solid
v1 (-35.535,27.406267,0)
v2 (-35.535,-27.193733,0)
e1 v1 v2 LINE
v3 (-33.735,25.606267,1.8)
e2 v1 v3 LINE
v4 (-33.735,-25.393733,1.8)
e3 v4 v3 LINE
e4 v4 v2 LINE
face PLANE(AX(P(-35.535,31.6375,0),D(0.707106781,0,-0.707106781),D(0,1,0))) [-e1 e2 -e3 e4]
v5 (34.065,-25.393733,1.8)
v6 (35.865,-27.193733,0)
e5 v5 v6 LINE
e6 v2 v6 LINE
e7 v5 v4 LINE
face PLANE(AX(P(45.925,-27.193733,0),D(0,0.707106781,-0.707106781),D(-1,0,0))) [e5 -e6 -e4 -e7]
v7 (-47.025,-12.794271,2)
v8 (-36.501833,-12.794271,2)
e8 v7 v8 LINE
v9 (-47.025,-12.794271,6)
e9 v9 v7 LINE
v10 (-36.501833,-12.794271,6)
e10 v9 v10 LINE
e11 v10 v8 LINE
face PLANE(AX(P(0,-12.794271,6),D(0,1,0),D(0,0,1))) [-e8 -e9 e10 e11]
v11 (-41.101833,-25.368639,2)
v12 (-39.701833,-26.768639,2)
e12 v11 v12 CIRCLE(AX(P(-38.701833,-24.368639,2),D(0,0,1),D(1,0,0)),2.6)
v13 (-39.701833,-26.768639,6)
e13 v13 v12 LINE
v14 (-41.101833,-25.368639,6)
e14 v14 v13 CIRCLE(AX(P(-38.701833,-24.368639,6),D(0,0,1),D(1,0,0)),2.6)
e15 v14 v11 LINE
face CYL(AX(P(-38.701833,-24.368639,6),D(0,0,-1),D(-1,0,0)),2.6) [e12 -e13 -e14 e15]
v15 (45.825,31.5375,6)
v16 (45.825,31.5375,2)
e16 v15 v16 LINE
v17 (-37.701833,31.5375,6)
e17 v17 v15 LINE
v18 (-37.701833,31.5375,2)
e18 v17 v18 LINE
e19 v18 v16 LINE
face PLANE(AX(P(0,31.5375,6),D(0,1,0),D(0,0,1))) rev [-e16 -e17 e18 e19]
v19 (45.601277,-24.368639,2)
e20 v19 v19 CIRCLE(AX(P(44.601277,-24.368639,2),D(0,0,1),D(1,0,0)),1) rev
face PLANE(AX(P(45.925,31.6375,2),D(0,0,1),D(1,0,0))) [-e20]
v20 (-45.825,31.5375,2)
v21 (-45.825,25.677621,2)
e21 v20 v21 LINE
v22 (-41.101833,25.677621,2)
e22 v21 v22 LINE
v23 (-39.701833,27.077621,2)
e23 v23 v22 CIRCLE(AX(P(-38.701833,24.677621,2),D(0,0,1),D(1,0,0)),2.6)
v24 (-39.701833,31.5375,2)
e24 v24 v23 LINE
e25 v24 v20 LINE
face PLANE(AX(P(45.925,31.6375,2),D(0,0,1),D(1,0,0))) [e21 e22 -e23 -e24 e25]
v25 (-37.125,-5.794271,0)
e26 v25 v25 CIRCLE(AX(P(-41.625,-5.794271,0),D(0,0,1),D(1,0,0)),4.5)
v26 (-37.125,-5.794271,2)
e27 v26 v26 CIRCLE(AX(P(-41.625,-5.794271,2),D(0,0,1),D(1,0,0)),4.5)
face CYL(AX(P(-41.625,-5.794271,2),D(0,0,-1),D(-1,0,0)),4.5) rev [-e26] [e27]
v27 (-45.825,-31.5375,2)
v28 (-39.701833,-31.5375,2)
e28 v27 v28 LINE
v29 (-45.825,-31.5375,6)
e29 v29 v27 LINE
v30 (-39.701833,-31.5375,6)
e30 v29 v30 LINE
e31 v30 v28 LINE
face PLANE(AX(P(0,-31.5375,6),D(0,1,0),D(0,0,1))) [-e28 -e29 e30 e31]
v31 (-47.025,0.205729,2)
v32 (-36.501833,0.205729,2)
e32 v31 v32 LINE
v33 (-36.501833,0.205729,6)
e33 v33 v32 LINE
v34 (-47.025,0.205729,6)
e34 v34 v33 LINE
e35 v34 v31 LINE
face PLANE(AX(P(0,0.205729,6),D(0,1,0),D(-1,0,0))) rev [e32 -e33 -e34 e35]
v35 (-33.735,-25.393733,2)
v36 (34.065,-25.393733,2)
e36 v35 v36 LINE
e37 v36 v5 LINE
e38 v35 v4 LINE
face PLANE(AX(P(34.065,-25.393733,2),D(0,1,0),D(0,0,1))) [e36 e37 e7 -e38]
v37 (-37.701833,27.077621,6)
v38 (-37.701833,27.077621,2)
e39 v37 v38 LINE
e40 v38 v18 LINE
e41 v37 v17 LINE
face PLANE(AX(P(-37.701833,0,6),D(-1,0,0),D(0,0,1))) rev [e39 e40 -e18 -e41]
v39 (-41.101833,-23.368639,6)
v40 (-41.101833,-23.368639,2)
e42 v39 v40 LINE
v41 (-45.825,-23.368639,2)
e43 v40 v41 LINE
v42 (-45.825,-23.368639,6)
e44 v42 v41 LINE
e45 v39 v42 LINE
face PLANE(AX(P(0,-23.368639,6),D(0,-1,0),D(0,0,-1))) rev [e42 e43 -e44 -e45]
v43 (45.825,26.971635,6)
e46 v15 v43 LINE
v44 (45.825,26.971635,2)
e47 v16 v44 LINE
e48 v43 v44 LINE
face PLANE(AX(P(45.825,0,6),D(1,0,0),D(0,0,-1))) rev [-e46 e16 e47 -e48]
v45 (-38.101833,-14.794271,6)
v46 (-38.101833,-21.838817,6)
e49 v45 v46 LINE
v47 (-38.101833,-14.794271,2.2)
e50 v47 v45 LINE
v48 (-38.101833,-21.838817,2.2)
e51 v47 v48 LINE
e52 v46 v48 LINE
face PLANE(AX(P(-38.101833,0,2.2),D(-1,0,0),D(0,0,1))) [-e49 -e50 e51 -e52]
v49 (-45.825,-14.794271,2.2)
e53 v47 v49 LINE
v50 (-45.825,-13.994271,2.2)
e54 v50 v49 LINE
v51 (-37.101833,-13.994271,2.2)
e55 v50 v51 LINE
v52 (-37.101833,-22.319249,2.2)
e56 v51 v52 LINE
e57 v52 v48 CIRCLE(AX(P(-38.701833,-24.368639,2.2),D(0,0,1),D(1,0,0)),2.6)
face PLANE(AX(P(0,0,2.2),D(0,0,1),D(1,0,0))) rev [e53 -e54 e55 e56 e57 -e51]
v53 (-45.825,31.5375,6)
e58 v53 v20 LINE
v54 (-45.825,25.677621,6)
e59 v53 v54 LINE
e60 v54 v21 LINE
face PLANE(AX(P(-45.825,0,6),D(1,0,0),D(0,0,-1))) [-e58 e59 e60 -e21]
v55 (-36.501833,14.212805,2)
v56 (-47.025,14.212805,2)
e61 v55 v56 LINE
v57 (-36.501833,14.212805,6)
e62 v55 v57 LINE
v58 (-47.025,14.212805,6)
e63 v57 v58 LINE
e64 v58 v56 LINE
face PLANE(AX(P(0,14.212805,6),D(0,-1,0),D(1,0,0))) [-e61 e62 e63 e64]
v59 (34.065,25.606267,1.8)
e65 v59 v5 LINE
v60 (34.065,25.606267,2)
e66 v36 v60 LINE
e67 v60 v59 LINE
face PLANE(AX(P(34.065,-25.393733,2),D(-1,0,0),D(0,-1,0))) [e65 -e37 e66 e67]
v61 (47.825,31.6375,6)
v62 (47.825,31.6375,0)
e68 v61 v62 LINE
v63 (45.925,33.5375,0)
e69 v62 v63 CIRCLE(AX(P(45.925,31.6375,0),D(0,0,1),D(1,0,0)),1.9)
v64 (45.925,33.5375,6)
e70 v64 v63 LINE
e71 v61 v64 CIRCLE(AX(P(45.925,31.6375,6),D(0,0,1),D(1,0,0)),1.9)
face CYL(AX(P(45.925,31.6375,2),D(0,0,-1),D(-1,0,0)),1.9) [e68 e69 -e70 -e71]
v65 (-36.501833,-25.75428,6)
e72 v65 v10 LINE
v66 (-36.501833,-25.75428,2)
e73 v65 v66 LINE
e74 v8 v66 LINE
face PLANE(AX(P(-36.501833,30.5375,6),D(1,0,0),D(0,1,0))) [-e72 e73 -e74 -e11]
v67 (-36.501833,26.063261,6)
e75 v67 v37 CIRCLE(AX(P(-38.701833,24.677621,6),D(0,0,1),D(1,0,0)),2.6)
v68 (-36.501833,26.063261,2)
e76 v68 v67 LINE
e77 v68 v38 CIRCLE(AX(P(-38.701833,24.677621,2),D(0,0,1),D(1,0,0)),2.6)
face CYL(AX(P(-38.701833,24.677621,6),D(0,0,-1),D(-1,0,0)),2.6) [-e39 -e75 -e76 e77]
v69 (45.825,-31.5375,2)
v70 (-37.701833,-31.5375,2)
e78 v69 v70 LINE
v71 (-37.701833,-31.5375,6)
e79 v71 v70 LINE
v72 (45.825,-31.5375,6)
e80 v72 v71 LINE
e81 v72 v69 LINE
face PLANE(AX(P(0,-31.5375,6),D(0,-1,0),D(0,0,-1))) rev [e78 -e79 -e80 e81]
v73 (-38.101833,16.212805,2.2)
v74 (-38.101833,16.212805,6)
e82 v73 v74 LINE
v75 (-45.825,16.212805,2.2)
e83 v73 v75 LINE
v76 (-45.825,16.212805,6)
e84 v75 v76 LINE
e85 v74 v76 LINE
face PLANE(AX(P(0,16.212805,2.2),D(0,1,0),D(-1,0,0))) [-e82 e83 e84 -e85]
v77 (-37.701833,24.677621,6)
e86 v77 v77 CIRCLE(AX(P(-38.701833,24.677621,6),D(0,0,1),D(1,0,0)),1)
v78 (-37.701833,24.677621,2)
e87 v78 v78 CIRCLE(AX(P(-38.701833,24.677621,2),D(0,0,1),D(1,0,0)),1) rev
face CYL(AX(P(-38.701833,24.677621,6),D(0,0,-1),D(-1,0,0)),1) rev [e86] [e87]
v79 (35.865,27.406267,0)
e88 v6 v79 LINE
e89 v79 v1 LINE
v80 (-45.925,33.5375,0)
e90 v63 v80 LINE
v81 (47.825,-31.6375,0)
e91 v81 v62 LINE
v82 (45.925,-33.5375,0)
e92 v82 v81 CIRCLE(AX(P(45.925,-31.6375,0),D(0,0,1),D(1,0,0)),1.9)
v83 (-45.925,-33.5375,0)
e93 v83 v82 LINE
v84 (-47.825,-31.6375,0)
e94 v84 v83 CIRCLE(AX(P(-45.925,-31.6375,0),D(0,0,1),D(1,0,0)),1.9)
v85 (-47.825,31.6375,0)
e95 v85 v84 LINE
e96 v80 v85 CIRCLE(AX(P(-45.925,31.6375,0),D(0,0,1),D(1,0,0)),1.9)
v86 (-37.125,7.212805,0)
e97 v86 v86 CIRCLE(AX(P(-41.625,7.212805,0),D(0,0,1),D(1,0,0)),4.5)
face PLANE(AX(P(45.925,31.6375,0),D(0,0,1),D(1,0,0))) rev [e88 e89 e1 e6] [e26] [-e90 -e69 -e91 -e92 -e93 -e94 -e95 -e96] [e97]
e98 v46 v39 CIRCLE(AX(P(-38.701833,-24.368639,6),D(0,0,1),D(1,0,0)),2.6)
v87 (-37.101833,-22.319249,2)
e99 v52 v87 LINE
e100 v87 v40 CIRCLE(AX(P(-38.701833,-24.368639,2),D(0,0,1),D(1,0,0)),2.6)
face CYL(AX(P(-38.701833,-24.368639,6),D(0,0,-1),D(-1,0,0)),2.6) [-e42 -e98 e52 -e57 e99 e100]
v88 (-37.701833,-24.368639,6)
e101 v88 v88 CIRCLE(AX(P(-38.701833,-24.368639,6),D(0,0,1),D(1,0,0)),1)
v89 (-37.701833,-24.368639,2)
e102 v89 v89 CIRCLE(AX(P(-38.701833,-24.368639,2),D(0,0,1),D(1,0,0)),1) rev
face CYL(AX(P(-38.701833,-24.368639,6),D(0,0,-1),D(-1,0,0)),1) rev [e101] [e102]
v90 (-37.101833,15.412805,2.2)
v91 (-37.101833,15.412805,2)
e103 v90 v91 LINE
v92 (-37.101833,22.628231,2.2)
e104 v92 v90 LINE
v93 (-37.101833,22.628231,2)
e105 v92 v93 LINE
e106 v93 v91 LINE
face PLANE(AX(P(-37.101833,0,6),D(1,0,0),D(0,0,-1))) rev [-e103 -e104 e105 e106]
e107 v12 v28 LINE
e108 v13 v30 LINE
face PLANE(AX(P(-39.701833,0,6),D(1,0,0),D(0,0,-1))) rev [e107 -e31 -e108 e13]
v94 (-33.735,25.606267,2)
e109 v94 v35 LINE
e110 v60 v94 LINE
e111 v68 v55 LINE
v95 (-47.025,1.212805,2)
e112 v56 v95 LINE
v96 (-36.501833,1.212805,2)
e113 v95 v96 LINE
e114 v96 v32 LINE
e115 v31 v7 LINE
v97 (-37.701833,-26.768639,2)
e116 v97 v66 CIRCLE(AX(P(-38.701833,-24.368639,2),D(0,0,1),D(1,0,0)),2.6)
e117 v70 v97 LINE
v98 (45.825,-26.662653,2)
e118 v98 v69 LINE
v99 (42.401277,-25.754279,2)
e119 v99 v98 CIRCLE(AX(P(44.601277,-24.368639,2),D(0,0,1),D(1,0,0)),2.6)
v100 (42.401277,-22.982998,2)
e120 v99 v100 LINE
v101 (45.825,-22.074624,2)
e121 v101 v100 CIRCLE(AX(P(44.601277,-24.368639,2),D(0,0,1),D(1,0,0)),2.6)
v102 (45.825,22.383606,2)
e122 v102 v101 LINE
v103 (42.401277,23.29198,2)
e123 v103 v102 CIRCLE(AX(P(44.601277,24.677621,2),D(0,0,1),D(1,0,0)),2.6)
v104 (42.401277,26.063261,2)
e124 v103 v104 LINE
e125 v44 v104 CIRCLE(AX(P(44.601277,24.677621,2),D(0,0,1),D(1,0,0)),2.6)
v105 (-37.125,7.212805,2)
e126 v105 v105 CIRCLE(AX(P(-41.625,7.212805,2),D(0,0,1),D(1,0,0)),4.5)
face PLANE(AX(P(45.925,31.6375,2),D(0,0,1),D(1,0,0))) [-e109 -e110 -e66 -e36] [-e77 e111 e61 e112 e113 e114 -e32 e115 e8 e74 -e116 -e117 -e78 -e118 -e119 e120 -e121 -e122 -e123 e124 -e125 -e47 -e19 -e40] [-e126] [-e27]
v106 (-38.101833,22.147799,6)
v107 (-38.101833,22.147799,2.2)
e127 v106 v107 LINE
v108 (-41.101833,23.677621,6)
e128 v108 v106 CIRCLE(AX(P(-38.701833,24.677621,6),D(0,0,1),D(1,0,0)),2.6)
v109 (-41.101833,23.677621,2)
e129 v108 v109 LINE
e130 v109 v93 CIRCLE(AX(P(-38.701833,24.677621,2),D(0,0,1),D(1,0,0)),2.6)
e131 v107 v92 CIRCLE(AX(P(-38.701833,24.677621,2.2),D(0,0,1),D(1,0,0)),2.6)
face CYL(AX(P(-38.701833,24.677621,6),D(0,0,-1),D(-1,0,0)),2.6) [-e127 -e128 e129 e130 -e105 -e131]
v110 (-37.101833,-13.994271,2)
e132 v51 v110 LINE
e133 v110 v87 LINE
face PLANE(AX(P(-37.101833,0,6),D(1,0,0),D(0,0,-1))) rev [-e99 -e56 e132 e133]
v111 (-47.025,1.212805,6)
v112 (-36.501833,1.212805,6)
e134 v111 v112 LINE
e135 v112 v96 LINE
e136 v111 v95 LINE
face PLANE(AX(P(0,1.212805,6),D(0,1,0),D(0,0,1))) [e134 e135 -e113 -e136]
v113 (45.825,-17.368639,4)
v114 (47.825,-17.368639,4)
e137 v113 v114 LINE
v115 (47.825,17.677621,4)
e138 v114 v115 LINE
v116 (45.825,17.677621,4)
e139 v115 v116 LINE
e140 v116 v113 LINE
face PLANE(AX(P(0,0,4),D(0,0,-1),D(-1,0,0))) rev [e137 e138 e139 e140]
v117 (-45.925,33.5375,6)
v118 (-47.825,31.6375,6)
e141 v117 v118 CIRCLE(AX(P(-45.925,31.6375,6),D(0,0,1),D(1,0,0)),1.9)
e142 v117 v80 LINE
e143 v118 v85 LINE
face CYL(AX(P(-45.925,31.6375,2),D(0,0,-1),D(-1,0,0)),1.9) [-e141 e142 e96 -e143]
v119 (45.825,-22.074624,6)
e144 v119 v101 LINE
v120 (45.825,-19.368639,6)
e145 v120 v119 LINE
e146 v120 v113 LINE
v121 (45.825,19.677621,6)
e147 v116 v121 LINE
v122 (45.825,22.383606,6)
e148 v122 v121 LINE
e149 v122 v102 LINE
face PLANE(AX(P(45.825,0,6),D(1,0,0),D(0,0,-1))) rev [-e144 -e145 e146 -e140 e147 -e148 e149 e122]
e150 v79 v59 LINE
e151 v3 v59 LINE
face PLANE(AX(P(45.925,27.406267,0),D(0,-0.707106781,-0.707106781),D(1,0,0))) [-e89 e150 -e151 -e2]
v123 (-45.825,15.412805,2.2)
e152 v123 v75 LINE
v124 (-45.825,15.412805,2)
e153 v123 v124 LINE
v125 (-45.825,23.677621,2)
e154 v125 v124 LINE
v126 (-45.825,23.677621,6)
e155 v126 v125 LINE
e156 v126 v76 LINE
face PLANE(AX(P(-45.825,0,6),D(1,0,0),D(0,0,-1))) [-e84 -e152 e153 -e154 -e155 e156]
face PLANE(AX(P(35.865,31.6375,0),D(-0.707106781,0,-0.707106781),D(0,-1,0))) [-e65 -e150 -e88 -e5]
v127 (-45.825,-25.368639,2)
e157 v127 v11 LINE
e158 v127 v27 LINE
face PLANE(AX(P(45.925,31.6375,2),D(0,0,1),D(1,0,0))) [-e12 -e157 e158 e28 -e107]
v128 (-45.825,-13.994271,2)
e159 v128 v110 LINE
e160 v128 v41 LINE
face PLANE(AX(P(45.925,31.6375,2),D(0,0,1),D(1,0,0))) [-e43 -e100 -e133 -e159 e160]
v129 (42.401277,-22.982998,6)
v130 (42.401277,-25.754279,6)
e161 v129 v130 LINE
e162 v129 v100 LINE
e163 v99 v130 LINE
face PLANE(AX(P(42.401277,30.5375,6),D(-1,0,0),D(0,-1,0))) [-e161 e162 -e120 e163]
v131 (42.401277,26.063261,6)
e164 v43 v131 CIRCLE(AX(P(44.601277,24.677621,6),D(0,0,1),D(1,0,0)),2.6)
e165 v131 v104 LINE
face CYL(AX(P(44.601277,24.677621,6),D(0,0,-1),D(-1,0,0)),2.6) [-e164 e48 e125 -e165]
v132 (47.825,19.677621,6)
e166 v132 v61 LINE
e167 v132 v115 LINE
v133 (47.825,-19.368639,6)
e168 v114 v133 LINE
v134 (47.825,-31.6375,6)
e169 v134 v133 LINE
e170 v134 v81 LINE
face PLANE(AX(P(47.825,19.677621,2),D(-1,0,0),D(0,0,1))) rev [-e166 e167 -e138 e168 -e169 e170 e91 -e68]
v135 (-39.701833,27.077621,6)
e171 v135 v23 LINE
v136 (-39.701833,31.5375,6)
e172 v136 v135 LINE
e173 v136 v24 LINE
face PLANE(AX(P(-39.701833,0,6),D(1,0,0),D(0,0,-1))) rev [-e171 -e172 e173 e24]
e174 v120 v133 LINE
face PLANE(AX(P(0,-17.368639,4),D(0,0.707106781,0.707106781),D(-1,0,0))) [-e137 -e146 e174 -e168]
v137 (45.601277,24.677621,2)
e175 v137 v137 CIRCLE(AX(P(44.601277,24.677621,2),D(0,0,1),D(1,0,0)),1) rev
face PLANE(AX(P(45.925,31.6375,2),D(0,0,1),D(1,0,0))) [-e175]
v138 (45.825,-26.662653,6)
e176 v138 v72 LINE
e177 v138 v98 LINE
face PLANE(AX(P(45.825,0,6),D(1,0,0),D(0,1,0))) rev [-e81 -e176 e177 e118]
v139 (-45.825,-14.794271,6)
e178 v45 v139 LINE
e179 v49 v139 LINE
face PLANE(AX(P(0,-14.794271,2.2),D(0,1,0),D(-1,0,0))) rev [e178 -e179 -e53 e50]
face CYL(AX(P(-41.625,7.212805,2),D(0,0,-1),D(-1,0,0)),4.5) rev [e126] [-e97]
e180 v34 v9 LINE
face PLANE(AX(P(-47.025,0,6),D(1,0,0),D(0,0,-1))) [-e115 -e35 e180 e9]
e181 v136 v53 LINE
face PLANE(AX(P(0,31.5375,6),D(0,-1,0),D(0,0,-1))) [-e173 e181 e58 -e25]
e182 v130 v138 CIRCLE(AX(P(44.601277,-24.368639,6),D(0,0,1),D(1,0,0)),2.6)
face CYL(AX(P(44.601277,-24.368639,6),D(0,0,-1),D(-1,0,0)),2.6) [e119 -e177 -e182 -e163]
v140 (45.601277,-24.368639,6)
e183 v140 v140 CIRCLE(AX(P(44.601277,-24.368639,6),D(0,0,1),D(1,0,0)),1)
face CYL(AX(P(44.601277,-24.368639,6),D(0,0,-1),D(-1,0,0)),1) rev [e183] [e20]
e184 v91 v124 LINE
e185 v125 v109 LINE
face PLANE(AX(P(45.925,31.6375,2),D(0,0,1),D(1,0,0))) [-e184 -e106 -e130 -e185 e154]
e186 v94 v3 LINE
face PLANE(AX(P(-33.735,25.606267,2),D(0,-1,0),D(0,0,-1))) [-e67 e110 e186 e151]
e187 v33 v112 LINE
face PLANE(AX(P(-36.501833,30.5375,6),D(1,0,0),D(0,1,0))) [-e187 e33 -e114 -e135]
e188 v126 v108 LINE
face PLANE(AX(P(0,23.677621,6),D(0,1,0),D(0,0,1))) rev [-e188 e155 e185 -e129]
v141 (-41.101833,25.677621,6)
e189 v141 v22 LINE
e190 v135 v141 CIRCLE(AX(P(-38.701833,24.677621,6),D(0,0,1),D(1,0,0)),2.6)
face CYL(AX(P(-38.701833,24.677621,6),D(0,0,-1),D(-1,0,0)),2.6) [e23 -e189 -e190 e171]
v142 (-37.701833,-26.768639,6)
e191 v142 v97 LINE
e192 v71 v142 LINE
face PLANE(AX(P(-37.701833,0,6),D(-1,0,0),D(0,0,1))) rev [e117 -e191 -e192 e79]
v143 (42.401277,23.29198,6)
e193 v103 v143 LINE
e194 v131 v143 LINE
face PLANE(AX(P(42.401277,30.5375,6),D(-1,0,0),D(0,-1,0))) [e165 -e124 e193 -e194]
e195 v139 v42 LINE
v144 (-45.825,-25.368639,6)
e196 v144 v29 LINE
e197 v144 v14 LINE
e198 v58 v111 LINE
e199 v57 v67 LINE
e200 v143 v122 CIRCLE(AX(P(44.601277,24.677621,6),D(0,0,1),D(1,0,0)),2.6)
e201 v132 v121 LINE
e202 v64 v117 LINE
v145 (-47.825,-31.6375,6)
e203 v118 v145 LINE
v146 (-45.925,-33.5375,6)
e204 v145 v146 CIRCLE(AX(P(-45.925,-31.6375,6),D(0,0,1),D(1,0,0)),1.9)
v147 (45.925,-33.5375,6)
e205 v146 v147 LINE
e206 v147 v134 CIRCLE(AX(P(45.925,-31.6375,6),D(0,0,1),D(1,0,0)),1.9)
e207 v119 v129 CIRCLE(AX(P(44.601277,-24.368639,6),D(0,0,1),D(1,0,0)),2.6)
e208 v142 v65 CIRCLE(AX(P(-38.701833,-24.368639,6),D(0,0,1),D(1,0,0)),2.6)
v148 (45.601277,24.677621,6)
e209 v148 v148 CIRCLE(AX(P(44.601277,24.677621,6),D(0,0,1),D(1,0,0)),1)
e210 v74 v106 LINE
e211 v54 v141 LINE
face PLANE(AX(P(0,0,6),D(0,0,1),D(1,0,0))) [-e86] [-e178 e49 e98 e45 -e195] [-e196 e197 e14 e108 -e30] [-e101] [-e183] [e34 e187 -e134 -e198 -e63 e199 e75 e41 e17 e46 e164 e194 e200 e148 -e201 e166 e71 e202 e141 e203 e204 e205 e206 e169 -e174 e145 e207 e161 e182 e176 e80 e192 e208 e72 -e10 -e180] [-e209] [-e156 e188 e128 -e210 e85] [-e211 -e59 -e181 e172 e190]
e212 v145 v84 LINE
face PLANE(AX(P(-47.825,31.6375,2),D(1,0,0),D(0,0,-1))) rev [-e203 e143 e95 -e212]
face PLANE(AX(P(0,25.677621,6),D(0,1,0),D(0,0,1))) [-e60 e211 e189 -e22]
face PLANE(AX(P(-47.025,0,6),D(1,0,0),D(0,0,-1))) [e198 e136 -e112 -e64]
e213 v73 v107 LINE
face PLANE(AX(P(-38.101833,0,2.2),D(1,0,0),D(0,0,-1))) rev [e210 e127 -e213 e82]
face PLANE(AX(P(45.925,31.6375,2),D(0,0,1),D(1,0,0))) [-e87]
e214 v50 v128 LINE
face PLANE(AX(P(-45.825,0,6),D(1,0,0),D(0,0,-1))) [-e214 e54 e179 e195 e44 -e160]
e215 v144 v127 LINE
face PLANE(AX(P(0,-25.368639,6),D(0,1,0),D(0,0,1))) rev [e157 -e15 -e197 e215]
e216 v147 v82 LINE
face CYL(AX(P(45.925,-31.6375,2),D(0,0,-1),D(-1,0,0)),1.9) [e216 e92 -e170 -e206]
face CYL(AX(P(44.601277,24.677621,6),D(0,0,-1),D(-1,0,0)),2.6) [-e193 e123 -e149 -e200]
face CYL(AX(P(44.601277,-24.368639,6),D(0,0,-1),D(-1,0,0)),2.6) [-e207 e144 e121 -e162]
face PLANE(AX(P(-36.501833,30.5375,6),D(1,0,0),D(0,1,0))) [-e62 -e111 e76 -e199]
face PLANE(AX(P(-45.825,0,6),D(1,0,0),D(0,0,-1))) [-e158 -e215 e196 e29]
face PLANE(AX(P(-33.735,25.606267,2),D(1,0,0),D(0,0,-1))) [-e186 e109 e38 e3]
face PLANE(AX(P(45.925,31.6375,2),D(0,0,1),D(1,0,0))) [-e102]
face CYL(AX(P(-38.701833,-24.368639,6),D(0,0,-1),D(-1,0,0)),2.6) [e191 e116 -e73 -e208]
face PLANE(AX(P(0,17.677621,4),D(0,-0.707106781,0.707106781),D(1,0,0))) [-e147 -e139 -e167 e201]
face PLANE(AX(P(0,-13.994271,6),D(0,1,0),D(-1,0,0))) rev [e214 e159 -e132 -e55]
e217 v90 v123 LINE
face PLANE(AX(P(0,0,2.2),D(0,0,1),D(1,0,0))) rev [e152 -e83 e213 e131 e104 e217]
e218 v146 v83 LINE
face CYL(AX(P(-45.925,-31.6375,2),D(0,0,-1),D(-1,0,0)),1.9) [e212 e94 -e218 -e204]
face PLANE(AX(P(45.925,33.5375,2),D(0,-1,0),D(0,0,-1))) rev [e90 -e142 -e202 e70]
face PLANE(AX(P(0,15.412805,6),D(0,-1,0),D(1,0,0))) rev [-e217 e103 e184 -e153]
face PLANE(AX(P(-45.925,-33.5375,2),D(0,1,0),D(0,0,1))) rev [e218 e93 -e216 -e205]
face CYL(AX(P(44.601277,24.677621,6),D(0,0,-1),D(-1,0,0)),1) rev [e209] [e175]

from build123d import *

# Parameters (mm, degrees)
SKETCH_2_R          = 4.5
SKETCH_2_W          = 67.8
SKETCH_2_H          = 51
EXTRUDE_1_DEPTH     = 2
SKETCH_3_R          = 1
EXTRUDE_2_DEPTH     = 4
SKETCH_4_W          = 7.723167142
SKETCH_4_H          = 2
SKETCH_4_W_2        = 2
SKETCH_4_H_2        = 9
SKETCH_4_H_3        = 10
EXTRUDE_3_DEPTH     = 3.8
CUT_EXTRUDE_1_DEPTH = 2
CHAMFER_2_SIZE      = 2
SKETCH_6_W          = 78.903110185
SKETCH_6_H          = 60.07500003
CUT_EXTRUDE_2_DEPTH = 4
CHAMFER_3_SIZE      = 1.8


with BuildPart() as part:
    # Эскиз2 → Бобышка-Вытянуть1 (new body)
    with BuildSketch(Plane.XY):
        with BuildLine():
            Line((-47.825, 31.6375), (-47.825, -31.6375))
            ThreePointArc((-47.825, -31.6375), (-47.268502884, -32.981002884), (-45.925, -33.5375))
            Line((-45.925, -33.5375), (45.925, -33.5375))
            ThreePointArc((45.925, -33.5375), (47.268502884, -32.981002884), (47.825, -31.6375))
            Line((47.825, -31.6375), (47.825, -19.36863872))
            Line((47.825, -19.36863872), (47.825, -17.36863872))
            Line((47.825, -17.36863872), (47.825, 17.677620675))
            Line((47.825, 17.677620675), (47.825, 19.677620675))
            Line((47.825, 19.677620675), (47.825, 31.6375))
            ThreePointArc((47.825, 31.6375), (47.268502884, 32.981002884), (45.925, 33.5375))
            Line((45.925, 33.5375), (-45.925, 33.5375))
            ThreePointArc((-45.925, 33.5375), (-47.268502884, 32.981002884), (-47.825, 31.6375))
        make_face()
        with Locations((-41.625, 7.212805211)):
            Circle(SKETCH_2_R, mode=Mode.SUBTRACT)
        with Locations((-41.625, -5.794271444)):
            Circle(SKETCH_2_R, mode=Mode.SUBTRACT)
        with Locations((0.165, 0.106266667)):
            Rectangle(SKETCH_2_W, SKETCH_2_H, mode=Mode.SUBTRACT)
    extrude(amount=EXTRUDE_1_DEPTH)

    # Эскиз3 → Бобышка-Вытянуть2 (add)
    with BuildSketch(Plane.XY.offset(2)):
        with BuildLine():
            ThreePointArc((47.825, 31.6375), (47.268502884, 32.981002884), (45.925, 33.5375))
            Line((45.925, 33.5375), (-45.925, 33.5375))
            ThreePointArc((-45.925, 33.5375), (-47.268502884, 32.981002884), (-47.825, 31.6375))
            Line((-47.825, 31.6375), (-47.825, -31.6375))
            ThreePointArc((-47.825, -31.6375), (-47.268502884, -32.981002884), (-45.925, -33.5375))
            Line((-45.925, -33.5375), (45.925, -33.5375))
            ThreePointArc((45.925, -33.5375), (47.268502884, -32.981002884), (47.825, -31.6375))
            Line((47.825, -31.6375), (47.825, 31.6375))
        make_face()
        with BuildLine():
            ThreePointArc((-41.101832747, -25.36863872), (-40.540310378, -26.207116351), (-39.701832747, -26.76863872))
            Line((-39.701832747, -26.76863872), (-39.701832747, -31.5375))
            Line((-39.701832747, -31.5375), (-45.825, -31.5375))
            Line((-45.825, -31.5375), (-45.825, -25.36863872))
            Line((-45.825, -25.36863872), (-41.101832747, -25.36863872))
        make_face(mode=Mode.SUBTRACT)
        with Locations((-38.701832747, -24.36863872)):
            Circle(SKETCH_3_R, mode=Mode.SUBTRACT)
        with BuildLine():
            ThreePointArc((-37.101832747, -22.319248567), (-39.361609166, -21.853744075), (-41.101832747, -23.36863872))
            Line((-41.101832747, -23.36863872), (-45.825, -23.36863872))
            Line((-45.825, -23.36863872), (-45.825, -13.994271444))
            Line((-45.825, -13.994271444), (-37.101832747, -13.994271444))
            Line((-37.101832747, -13.994271444), (-37.101832747, -22.319248567))
        make_face(mode=Mode.SUBTRACT)
        with Locations((44.601277438, -24.36863872)):
            Circle(SKETCH_3_R, mode=Mode.SUBTRACT)
        with BuildLine():
            Line((-36.101832858, 1.212805211), (-36.501832747, 1.212805211))
            Line((-36.501832747, 1.212805211), (-47.025, 1.212805211))
            Line((-47.025, 1.212805211), (-47.025, 14.212805211))
            Line((-47.025, 14.212805211), (-36.501832747, 14.212805211))
            Line((-36.501832747, 14.212805211), (-36.101832858, 14.212805211))
            Line((-36.101832858, 14.212805211), (-36.101832858, 24.677620706))
            ThreePointArc((-36.101832858, 24.677620706), (-36.538502092, 26.119841216), (-37.701832858, 27.077620706))
            Line((-37.701832858, 27.077620706), (-37.701832858, 31.53750003))
            Line((-37.701832858, 31.53750003), (45.824999889, 31.53750003))
            Line((45.824999889, 31.53750003), (45.824999889, 26.971635329))
            ThreePointArc((45.824999889, 26.971635329), (42.001277327, 24.677620706), (45.824999889, 22.383606083))
            Line((45.824999889, 22.383606083), (45.824999889, 19.677620706))
            Line((45.824999889, 19.677620706), (45.825, 17.677620675))
            Line((45.825, 17.677620675), (45.825, -17.36863872))
            Line((45.825, -17.36863872), (45.825, -19.36863872))
            Line((45.825, -19.36863872), (45.825, -22.074624097))
            ThreePointArc((45.825, -22.074624097), (42.001277438, -24.36863872), (45.825, -26.662653343))
            Line((45.825, -26.662653343), (45.825, -31.5375))
            Line((45.825, -31.5375), (-37.701832747, -31.5375))
            Line((-37.701832747, -31.5375), (-37.701832747, -26.76863872))
            ThreePointArc((-37.701832747, -26.76863872), (-36.538272941, -25.81051562), (-36.101832858, -24.367812827))
            Line((-36.101832858, -24.367812827), (-36.101832858, -12.794271444))
            Line((-36.101832858, -12.794271444), (-36.501832747, -12.794271444))
            Line((-36.501832747, -12.794271444), (-47.025, -12.794271444))
            Line((-47.025, -12.794271444), (-47.025, 0.205728556))
            Line((-47.025, 0.205728556), (-36.501832747, 0.205728556))
            Line((-36.501832747, 0.205728556), (-36.101832858, 0.205728556))
            Line((-36.101832858, 0.205728556), (-36.101832858, 1.212805211))
        make_face(mode=Mode.SUBTRACT)
        with BuildLine():
            Line((-45.825, 15.412805211), (-45.825, 23.677620675))
            Line((-45.825, 23.677620675), (-41.101832747, 23.677620675))
            ThreePointArc((-41.101832747, 23.677620675), (-39.361609166, 22.16272603), (-37.101832747, 22.628230522))
            Line((-37.101832747, 22.628230522), (-37.101832747, 15.412805211))
            Line((-37.101832747, 15.412805211), (-45.825, 15.412805211))
        make_face(mode=Mode.SUBTRACT)
        with Locations((-38.701832747, 24.677620675)):
            Circle(SKETCH_3_R, mode=Mode.SUBTRACT)
        with BuildLine():
            Line((-45.825, 25.677620675), (-45.825, 31.5375))
            Line((-45.825, 31.5375), (-39.701832747, 31.5375))
            Line((-39.701832747, 31.5375), (-39.701832747, 27.077620675))
            ThreePointArc((-39.701832747, 27.077620675), (-40.540310378, 26.516098306), (-41.101832747, 25.677620675))
            Line((-41.101832747, 25.677620675), (-45.825, 25.677620675))
        make_face(mode=Mode.SUBTRACT)
        with Locations((44.601277438, 24.677620675)):
            Circle(SKETCH_3_R, mode=Mode.SUBTRACT)
    extrude(amount=EXTRUDE_2_DEPTH)

    # Эскиз4 → Бобышка-Вытянуть3 (add)
    with BuildSketch(Plane.XY.offset(6)):
        with Locations((-41.963416429, 15.212805211)):
            Rectangle(SKETCH_4_W, SKETCH_4_H)
        with Locations((-37.101832858, 18.712805211)):
            Rectangle(SKETCH_4_W_2, SKETCH_4_H_2)
        with Locations((-41.963416429, -13.794271444)):
            Rectangle(SKETCH_4_W, SKETCH_4_H)
        with Locations((-37.101832858, -17.794271444)):
            Rectangle(SKETCH_4_W_2, SKETCH_4_H_3)
    extrude(amount=-EXTRUDE_3_DEPTH)

    # Эскиз5 → Вырез-Вытянуть1 (cut)
    with BuildSketch(Plane.XY.offset(6)):
        Polygon((47.825, -17.36863872), (47.825, -19.36863872), (45.825, -19.36863872), (45.825, -17.36863872), (45.825, 17.677620675), (45.824999889, 19.677620706), (47.825, 19.677620706), (47.825, 17.677620675), align=None)
    extrude(amount=-CUT_EXTRUDE_1_DEPTH, mode=Mode.SUBTRACT)

    # Фаска2
    chamfer_2_edges = [part.edges().sort_by_distance(p)[0] for p in [
        (46.824999945, 19.677620706, 4),
        (46.825, -19.36863872, 4),
    ]]
    chamfer(chamfer_2_edges, length=CHAMFER_2_SIZE - 0.0001)  # a hair under: the kernel refuses the full size

    # Эскиз6 → Вырез-Вытянуть2 (cut)
    with BuildSketch(Plane.XY.offset(2)):
        with Locations((2.949722235, 0.500000015)):
            Rectangle(SKETCH_6_W, SKETCH_6_H)
    extrude(amount=CUT_EXTRUDE_2_DEPTH, mode=Mode.SUBTRACT)

    # Фаска3
    chamfer_3_edges = [part.edges().sort_by_distance(p)[0] for p in [
        (34.065, 0.106266667, 0),
        (0.165, 25.606266667, 0),
        (-33.735, 0.106266667, 0),
        (0.165, -25.393733333, 0),
    ]]
    chamfer(chamfer_3_edges, length=CHAMFER_3_SIZE)


solid = part.part
